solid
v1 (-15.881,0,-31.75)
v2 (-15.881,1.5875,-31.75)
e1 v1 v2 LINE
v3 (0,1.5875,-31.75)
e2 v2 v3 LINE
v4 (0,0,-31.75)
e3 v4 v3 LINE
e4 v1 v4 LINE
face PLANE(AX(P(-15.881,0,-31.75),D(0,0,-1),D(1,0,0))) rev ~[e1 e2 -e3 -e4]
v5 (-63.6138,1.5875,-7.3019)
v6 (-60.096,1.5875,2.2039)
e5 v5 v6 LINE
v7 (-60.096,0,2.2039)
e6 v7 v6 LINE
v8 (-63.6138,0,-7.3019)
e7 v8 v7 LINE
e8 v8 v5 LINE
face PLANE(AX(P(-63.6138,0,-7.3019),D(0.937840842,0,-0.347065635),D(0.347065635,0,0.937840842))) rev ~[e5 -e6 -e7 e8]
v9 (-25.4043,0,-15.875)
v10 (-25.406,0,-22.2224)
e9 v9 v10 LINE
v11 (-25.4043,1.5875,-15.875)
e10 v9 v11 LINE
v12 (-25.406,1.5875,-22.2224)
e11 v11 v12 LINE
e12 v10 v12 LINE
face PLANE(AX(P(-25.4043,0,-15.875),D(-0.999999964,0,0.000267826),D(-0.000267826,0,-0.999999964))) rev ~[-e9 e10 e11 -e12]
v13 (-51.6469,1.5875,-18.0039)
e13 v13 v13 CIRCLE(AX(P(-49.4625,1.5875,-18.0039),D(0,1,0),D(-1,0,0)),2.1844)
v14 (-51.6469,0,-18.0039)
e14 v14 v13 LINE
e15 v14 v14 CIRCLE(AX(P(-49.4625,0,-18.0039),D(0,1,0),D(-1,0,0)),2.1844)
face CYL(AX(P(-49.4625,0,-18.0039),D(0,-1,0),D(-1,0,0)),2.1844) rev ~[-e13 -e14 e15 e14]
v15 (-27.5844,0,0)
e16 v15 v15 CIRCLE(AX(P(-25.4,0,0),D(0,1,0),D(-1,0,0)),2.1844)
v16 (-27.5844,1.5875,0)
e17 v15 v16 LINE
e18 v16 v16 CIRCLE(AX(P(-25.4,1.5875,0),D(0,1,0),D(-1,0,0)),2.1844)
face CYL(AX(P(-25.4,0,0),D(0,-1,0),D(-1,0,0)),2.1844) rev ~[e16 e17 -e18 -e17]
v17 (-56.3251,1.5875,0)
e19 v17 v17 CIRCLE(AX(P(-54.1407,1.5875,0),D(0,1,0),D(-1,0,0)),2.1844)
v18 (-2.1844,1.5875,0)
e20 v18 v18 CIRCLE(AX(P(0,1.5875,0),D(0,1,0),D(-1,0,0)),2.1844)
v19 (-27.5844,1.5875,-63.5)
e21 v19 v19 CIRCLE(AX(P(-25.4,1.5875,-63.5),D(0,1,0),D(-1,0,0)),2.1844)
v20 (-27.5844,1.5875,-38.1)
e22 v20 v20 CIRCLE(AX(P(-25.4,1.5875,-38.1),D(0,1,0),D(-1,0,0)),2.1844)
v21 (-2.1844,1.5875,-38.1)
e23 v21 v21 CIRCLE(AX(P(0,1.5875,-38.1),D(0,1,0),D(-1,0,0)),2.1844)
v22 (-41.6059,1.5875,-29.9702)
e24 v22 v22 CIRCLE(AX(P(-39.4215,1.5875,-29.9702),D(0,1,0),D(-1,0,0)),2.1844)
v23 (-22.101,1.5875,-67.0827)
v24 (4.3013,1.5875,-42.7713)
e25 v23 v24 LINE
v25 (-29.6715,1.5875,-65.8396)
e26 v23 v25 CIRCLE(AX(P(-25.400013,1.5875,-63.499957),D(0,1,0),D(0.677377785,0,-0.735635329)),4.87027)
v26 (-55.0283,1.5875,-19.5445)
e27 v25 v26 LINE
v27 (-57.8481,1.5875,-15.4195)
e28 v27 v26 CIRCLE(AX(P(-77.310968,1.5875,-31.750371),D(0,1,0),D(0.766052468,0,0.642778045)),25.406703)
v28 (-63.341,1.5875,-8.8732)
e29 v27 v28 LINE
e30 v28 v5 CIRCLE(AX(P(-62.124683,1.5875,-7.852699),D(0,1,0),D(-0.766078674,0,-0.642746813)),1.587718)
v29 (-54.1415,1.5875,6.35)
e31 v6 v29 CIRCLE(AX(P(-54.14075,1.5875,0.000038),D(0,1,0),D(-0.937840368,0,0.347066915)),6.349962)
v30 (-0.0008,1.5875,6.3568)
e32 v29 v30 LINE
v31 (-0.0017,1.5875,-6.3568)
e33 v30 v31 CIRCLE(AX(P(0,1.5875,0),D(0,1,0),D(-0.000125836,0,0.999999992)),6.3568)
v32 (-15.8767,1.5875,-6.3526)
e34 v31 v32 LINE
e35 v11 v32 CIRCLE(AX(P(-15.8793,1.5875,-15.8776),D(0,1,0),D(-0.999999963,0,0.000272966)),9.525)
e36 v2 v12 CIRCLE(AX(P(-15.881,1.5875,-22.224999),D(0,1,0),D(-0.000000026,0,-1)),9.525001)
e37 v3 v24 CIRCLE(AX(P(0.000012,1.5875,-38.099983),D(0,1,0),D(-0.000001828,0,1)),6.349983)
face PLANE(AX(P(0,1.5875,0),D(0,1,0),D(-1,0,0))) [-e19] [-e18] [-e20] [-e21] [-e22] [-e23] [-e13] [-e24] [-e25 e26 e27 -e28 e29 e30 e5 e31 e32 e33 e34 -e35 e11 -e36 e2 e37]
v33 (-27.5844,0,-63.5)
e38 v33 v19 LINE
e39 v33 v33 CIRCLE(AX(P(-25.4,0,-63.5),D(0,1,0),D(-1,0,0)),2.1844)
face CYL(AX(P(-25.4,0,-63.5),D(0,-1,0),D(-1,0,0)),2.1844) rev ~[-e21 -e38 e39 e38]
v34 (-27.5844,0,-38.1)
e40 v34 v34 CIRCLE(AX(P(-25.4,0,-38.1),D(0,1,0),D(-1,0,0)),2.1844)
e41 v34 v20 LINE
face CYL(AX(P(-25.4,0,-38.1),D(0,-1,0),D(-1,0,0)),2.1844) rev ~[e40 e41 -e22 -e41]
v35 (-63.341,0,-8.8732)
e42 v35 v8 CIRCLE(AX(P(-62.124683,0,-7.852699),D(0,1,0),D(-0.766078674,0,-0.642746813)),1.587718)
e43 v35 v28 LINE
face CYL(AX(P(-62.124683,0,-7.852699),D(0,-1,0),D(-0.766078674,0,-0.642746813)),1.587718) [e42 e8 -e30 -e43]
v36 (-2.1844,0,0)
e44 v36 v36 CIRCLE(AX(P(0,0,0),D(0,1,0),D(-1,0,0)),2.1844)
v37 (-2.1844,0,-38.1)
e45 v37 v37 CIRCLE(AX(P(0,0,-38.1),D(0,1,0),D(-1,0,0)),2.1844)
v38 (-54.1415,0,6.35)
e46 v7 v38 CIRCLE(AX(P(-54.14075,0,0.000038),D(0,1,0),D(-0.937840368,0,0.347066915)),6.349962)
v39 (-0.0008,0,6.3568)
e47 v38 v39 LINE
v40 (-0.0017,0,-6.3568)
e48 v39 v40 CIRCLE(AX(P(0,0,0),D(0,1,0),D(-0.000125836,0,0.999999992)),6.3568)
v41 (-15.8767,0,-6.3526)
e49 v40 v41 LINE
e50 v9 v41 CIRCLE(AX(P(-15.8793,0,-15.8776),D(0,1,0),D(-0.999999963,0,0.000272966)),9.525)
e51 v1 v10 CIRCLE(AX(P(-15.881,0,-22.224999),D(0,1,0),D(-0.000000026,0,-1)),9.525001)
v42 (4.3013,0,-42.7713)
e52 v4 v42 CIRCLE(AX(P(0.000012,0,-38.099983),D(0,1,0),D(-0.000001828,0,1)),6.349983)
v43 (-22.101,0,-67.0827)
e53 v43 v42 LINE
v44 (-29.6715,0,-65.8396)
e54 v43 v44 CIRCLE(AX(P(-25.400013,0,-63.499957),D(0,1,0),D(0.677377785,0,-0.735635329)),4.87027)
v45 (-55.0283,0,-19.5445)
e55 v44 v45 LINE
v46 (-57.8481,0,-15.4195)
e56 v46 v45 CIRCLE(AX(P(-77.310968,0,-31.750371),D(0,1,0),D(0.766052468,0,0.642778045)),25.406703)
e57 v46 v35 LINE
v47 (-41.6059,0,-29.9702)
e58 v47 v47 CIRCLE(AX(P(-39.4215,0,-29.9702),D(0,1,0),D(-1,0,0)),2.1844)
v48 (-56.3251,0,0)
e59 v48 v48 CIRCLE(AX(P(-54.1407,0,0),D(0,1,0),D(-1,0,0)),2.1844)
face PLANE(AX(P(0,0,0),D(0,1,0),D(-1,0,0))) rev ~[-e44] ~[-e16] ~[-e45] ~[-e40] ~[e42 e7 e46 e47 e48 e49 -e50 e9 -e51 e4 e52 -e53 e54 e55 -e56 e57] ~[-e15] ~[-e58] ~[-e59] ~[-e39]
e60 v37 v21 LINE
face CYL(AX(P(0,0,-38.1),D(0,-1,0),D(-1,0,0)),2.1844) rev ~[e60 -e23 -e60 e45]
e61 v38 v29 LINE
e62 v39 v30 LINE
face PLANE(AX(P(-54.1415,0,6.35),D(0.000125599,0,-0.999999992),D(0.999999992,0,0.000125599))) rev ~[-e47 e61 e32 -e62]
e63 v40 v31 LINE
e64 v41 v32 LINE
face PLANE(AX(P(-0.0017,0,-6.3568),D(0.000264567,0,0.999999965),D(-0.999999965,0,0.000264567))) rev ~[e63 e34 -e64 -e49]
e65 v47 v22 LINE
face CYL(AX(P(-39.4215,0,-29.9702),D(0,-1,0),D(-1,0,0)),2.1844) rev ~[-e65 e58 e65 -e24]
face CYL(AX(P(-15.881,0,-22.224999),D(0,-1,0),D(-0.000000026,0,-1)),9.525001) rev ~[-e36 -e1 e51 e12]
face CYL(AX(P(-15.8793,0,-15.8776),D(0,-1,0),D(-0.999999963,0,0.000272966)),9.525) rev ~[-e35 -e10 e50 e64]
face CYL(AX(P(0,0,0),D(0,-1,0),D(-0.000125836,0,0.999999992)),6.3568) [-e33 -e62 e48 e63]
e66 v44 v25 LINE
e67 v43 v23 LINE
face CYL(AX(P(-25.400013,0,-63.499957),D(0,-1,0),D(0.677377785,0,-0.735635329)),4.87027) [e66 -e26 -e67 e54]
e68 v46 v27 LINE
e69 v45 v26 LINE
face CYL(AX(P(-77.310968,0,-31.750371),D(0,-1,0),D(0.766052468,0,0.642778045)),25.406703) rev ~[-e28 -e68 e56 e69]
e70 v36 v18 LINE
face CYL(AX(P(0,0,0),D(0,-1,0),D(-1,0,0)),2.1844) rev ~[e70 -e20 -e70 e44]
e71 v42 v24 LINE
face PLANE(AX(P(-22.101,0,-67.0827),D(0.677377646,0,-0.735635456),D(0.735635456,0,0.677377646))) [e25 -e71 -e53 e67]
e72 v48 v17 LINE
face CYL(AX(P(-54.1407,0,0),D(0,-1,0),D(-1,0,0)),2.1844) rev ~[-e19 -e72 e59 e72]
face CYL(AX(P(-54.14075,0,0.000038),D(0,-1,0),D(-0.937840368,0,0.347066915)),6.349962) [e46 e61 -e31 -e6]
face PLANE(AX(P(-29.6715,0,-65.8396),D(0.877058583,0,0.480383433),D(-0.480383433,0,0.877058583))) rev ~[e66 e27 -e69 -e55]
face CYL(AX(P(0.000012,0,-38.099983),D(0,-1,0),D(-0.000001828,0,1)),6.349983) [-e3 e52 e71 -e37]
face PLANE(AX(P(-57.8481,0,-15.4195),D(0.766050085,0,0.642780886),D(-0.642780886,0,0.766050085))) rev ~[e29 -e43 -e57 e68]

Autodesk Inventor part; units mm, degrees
ref_plane "YZ Plane" through (0, 0, 0) normal (1, 0, 0) x (0, 1, 0)
ref_plane "XZ Plane" through (0, 0, 0) normal (0, 1, 0) x (-1, 0, 0)
ref_plane "XY Plane" through (0, 0, 0) normal (0, 0, 1) x (1, 0, 0)
sketch "main" plane through (0, 0, 0) normal (0, 0, 1) x (1, 0, 0)
  line L0 (12.0188, -14.2552) -> (37.3756, 32.0398)
  circle A0 centre (21.7688, 21.6141) radius 2.1844
  line L1 (40.1954, 36.1649) -> (45.6883, 42.7111)
  circle A1 centre (31.8098, 33.5805) radius 2.1844
  circle A2 centre (36.488, 51.5844) radius 2.1844
  arc A3 (42.4433, 53.7882) -> (36.4888, 57.9344) centre (36.488, 51.5844) ccw
  line L2 (45.961, 44.2825) -> (42.4433, 53.7882)
  arc A4 (45.6883, 42.7111) -> (45.961, 44.2825) centre (44.4722, 43.7316) ccw
  line L3 (36.4888, 57.9344) -> (-17.6519, 57.9412)
  circle A5 centre (7.7473, 51.5844) radius 2.1844
  line L4 (7.7515, 35.7094) -> (7.7532, 29.3619)
  arc A6 (7.7515, 35.7094) -> (-1.776, 45.2318) centre (-1.7735, 35.7068) ccw
  arc A7 (-1.7718, 19.8344) -> (7.7532, 29.3619) centre (-1.7718, 29.3594) ccw
  line L5 (-17.651, 45.2276) -> (-1.776, 45.2318)
  arc A8 (-17.6519, 57.9412) -> (-17.651, 45.2276) centre (-17.6527, 51.5844) ccw
  arc A9 (-17.6527, 19.8344) -> (-21.9541, 8.8131) centre (-17.6527, 13.4844) ccw
  circle A10 centre (7.7473, 13.4844) radius 2.1844
  line L6 (-1.7718, 19.8344) -> (-17.6527, 19.8344)
  arc A11 (4.4483, -15.4983) -> (12.0188, -14.2552) centre (7.7473, -11.9156) ccw
  line L7 (4.4483, -15.4983) -> (-21.9541, 8.8131)
  circle A12 centre (7.7473, -11.9156) radius 2.1844
  circle A13 centre (-17.6527, 51.5844) radius 2.1844
  circle A14 centre (-17.6527, 13.4844) radius 2.1844
  arc A15 (40.1954, 36.1649) -> (37.3756, 32.0398) centre (59.6529, 19.8381) ccw
  point P0 (10.5119, 26.5593)
  dimension "d1" = 9.7405
  dimension "d2" = 4.3688
  dimension "d3" = 4.3688
  dimension "d4" = 4.3688
  dimension "d5" = 4.3688
  dimension "d6" = 4.3688
  dimension "d7" = 25.4
sketch "Sketch1" plane through (0, 0, 0) normal (0, 1, 0) x (-1, 0, 0)
  line L0 (29.6715, -65.8396) -> (55.0283, -19.5445)
  circle A0 centre (39.4215, -29.9702) radius 2.1844
  line L1 (57.8481, -15.4195) -> (63.341, -8.8732)
  circle A1 centre (49.4625, -18.0039) radius 2.1844
  circle A2 centre (54.1407, 0) radius 2.1844
  arc A3 (60.096, 2.2039) -> (54.1415, 6.35) centre (54.1407, 0) ccw
  line L2 (63.6138, -7.3019) -> (60.096, 2.2039)
  arc A4 (63.341, -8.8732) -> (63.6138, -7.3019) centre (62.1249, -7.8528) ccw
  line L3 (54.1415, 6.35) -> (0.0008, 6.3568)
  circle A5 centre (25.4, 0) radius 2.1844
  line L4 (25.4043, -15.875) -> (25.406, -22.2224)
  arc A6 (25.4043, -15.875) -> (15.8767, -6.3526) centre (15.8793, -15.8776) ccw
  arc A7 (15.881, -31.75) -> (25.406, -22.2224) centre (15.881, -22.225) ccw
  line L5 (0.0017, -6.3568) -> (15.8767, -6.3526)
  arc A8 (0.0008, 6.3568) -> (0.0017, -6.3568) centre (0, 0) ccw
  arc A9 (0, -31.75) -> (-4.3013, -42.7713) centre (0, -38.1) ccw
  circle A10 centre (25.4, -38.1) radius 2.1844
  line L6 (15.881, -31.75) -> (0, -31.75)
  arc A11 (22.101, -67.0827) -> (29.6715, -65.8396) centre (25.4, -63.5) ccw
  line L7 (22.101, -67.0827) -> (-4.3013, -42.7713)
  circle A12 centre (25.4, -63.5) radius 2.1844
  circle A13 centre (0, 0) radius 2.1844
  circle A14 centre (0, -38.1) radius 2.1844
  arc A15 (57.8481, -15.4195) -> (55.0283, -19.5445) centre (77.3056, -31.7463) ccw
extrude "Extrusion1" add sketch "Sketch1" along normal blind 1.5875
properties part number "Funnel Gusset Back Improved" material "Acetal Resin, White"
